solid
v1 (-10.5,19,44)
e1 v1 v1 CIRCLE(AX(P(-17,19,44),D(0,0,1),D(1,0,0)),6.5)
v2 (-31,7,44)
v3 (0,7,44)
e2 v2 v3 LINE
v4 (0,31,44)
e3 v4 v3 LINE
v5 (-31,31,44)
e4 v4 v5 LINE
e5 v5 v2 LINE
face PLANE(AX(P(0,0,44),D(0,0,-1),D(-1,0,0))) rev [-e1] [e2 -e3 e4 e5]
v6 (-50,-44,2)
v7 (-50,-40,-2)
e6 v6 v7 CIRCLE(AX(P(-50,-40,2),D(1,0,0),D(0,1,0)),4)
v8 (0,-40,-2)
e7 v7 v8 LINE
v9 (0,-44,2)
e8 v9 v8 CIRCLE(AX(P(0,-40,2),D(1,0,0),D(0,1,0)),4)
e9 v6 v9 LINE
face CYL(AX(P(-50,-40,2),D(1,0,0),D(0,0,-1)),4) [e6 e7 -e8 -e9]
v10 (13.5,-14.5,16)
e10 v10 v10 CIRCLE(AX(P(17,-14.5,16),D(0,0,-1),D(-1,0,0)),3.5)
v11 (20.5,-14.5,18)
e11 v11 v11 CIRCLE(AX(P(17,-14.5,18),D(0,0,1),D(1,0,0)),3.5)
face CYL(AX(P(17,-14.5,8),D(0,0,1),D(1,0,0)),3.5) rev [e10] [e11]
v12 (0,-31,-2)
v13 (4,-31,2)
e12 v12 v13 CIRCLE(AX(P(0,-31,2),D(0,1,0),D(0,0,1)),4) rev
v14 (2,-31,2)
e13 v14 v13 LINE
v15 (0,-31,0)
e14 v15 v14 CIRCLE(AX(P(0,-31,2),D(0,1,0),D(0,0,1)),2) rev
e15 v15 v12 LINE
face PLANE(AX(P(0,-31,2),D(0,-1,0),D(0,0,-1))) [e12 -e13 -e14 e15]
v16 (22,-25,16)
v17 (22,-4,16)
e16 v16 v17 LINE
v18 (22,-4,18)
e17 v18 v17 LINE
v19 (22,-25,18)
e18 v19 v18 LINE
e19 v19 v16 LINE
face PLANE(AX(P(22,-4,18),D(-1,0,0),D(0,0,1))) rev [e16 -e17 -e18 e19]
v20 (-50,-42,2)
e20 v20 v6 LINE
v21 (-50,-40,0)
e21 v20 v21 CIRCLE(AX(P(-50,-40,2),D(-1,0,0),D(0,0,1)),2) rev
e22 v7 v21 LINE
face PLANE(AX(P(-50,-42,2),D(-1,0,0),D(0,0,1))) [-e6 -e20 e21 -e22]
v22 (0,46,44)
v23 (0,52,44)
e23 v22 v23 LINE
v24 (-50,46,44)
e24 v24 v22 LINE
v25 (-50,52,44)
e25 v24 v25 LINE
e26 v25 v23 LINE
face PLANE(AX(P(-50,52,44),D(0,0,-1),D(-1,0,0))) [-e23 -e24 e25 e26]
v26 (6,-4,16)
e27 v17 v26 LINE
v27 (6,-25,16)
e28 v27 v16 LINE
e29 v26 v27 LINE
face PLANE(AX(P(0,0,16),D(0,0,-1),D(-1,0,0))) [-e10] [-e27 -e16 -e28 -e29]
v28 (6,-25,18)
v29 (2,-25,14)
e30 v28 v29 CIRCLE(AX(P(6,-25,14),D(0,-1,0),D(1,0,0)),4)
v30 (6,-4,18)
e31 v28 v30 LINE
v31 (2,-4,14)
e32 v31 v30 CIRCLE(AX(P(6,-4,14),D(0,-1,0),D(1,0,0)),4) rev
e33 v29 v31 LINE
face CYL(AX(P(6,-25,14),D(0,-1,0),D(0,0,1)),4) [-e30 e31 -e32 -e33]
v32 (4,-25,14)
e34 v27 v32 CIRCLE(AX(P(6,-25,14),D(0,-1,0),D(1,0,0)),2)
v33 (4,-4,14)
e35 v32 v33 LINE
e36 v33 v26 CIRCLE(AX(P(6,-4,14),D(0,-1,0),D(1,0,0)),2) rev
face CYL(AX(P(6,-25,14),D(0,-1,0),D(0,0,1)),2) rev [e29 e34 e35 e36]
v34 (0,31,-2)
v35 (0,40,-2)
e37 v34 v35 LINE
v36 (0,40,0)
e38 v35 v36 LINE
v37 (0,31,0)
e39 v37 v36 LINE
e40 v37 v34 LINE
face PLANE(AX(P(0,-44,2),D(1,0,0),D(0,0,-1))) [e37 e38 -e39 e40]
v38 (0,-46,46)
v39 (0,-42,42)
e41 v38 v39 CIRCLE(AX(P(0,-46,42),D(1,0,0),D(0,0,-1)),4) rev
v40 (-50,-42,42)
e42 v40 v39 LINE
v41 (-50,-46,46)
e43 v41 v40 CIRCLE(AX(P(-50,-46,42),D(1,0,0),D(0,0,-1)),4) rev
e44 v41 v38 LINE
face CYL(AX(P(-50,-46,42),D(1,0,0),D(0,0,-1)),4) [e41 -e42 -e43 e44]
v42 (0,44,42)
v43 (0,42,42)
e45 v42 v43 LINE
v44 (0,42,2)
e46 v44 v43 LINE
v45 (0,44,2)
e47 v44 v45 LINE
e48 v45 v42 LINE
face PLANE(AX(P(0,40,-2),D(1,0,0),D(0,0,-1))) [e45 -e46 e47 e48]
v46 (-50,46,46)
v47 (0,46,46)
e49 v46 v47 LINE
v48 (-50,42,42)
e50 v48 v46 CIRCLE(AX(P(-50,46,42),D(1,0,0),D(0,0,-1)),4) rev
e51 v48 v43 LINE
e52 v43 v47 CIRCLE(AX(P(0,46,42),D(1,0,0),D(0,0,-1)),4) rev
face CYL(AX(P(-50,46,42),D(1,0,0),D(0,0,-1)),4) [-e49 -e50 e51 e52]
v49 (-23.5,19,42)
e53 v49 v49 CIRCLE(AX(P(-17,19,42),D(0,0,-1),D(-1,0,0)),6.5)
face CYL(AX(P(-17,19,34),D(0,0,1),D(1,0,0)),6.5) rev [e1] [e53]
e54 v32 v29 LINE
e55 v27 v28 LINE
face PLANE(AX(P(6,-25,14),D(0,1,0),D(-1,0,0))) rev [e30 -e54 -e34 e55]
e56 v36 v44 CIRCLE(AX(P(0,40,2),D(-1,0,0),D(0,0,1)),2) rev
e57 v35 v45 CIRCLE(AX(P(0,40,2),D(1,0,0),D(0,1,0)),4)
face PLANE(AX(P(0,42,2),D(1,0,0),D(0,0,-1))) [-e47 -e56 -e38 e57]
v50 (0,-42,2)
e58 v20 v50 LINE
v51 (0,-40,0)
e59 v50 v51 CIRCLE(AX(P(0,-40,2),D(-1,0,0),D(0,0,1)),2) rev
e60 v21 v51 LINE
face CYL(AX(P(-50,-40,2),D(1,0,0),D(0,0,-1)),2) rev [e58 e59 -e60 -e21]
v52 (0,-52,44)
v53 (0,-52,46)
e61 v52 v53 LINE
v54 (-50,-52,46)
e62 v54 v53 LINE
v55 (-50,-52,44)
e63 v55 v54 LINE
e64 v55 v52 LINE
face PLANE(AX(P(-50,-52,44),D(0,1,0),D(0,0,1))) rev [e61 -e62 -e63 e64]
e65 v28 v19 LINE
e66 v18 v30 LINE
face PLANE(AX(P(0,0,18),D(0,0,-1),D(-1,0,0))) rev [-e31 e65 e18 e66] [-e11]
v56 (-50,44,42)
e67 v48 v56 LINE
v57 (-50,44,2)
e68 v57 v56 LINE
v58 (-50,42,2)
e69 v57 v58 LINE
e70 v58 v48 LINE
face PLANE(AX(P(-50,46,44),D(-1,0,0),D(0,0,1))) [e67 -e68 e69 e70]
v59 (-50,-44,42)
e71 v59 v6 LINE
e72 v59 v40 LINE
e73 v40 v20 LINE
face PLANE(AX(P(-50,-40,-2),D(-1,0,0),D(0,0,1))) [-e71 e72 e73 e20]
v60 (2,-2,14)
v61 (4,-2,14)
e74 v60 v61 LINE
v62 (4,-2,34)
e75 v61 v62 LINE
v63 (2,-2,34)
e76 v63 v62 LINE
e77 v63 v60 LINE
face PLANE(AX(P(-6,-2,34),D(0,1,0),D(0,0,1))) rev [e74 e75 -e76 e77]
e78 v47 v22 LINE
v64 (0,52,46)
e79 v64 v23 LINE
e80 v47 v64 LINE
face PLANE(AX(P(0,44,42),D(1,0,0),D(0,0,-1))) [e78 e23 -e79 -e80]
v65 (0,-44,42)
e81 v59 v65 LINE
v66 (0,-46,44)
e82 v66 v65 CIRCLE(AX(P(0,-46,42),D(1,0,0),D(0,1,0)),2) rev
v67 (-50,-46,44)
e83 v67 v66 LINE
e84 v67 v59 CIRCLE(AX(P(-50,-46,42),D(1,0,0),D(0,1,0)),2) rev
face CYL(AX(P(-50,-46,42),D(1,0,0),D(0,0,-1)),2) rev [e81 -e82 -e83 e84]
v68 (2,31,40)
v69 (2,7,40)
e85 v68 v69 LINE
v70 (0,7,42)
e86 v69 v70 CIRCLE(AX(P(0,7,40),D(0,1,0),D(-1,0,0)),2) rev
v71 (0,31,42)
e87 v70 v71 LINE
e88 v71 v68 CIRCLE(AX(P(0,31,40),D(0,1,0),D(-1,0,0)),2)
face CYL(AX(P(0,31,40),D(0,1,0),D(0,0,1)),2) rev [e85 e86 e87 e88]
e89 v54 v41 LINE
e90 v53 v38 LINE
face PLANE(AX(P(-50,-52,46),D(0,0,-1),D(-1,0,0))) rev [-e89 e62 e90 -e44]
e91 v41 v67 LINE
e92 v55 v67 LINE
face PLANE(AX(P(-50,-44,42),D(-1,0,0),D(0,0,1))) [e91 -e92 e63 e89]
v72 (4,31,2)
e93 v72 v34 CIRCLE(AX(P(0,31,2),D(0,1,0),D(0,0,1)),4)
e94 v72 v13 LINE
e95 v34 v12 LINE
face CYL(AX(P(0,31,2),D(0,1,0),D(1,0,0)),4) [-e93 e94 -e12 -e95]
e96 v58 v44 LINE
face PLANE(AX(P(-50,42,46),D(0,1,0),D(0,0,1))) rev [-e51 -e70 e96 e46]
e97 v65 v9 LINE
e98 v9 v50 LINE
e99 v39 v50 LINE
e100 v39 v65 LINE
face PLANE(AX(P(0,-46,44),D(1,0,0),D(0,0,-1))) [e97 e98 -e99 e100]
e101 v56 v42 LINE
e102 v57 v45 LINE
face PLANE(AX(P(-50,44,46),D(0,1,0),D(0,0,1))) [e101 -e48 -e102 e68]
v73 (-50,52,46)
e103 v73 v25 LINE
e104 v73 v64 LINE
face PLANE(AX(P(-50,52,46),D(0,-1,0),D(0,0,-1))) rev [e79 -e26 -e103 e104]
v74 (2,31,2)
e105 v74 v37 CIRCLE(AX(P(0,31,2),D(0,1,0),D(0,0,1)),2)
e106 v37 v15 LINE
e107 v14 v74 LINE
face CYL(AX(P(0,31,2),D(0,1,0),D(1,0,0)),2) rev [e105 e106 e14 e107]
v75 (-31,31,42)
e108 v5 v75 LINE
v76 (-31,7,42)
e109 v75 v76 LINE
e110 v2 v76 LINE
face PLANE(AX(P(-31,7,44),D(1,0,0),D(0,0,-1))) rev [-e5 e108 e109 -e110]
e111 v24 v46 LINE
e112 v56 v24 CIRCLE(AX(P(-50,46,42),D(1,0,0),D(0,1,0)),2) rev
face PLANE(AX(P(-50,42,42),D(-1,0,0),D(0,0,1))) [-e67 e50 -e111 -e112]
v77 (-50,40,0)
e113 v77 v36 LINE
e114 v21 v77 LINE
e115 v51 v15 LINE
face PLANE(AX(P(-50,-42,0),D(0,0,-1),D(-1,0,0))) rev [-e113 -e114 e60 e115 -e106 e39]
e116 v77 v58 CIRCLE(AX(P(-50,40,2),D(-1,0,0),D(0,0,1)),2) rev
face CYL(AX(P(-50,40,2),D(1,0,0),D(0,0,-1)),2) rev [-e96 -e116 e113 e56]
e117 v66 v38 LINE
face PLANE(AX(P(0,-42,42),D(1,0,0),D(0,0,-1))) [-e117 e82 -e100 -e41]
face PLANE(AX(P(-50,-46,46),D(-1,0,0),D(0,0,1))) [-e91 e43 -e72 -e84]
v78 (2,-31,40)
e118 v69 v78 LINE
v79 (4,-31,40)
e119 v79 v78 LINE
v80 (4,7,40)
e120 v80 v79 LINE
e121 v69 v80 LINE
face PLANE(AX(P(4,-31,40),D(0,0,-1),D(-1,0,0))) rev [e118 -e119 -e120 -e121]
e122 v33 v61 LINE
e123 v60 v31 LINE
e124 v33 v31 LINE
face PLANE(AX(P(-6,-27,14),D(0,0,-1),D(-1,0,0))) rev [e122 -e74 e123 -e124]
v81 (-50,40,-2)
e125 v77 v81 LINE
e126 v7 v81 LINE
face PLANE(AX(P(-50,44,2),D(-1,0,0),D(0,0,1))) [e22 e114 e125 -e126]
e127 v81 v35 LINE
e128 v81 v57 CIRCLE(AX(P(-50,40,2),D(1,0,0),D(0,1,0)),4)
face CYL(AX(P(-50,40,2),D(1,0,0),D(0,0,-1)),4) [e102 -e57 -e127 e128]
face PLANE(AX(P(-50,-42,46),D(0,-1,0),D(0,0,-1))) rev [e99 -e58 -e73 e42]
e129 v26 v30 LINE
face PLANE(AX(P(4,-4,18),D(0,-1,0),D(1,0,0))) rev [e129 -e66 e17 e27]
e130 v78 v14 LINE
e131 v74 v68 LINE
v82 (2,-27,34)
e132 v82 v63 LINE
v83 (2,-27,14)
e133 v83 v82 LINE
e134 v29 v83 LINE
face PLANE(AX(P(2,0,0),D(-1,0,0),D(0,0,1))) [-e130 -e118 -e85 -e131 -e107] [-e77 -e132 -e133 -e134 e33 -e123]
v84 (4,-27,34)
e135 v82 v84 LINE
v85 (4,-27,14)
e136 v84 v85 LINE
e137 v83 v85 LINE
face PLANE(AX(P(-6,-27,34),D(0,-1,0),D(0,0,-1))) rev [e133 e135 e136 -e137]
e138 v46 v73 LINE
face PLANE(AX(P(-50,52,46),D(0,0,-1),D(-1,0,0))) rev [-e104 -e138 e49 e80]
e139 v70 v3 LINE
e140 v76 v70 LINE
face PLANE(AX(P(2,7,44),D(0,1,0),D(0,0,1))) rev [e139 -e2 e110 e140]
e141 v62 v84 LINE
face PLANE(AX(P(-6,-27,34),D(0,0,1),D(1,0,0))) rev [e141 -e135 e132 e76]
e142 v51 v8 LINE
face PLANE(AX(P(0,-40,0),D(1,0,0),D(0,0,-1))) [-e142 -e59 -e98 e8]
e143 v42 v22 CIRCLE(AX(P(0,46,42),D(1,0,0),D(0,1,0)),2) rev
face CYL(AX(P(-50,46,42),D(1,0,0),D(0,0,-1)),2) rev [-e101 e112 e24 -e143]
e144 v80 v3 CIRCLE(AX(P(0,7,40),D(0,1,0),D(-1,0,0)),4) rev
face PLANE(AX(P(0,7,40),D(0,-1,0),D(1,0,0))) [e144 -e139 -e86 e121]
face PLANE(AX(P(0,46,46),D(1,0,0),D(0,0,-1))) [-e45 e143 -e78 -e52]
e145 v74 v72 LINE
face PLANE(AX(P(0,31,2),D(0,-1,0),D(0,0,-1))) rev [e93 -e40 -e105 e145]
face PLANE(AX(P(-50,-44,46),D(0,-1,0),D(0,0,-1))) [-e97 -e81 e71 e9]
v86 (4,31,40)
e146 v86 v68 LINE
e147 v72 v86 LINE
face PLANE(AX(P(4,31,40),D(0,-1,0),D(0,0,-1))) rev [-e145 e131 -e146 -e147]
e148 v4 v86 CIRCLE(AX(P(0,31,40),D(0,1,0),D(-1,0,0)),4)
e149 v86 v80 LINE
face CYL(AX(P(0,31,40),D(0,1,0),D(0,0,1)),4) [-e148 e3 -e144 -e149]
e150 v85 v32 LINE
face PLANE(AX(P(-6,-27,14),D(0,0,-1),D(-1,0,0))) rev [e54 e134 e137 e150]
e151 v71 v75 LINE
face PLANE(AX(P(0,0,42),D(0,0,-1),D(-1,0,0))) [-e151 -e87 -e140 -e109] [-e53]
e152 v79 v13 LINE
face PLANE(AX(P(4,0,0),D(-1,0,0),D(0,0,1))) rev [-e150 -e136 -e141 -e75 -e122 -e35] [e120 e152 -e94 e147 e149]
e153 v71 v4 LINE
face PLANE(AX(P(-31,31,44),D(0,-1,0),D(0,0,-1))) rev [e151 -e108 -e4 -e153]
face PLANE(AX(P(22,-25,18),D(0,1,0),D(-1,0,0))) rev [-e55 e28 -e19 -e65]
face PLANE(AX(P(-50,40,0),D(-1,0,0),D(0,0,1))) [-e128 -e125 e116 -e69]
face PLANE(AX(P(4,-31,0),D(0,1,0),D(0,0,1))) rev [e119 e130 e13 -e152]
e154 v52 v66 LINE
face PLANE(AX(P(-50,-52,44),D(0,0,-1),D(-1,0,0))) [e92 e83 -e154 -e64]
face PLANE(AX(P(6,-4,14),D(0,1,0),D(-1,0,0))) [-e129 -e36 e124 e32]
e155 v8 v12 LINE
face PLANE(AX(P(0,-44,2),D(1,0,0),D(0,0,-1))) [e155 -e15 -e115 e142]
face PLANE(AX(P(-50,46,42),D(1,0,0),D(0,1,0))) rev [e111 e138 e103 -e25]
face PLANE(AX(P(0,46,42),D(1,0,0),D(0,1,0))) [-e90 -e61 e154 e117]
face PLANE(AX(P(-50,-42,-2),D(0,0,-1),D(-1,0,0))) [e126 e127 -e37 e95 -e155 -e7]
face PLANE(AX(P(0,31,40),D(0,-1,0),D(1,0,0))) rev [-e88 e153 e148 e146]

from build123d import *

# Parameters (mm, degrees)
BASE_FLANGE1_DEPTH = 50
EDGE_FLANGE1_DEPTH = 62
SKETCH9_W          = 25
SKETCH9_H          = 20
CUT_EXTRUDE1_DEPTH = 10
EDGE_FLANGE2_DEPTH = 21
SKETCH13_R         = 3.5
CUT_EXTRUDE2_DEPTH = 10
EDGE_FLANGE3_DEPTH = 24
SKETCH17_R         = 6.5
CUT_EXTRUDE3_DEPTH = 10


# Sheet-metal steps are written as plain solids
with BuildPart() as part:
    # Sketch1 → Base-Flange1 (new body)
    with BuildSketch(Plane.YZ):
        with BuildLine():
            Line((-52, 46), (-46, 46))
            ThreePointArc((-46, 46), (-43.171572875, 44.828427125), (-42, 42))
            Line((-42, 42), (-42, 2))
            ThreePointArc((-42, 2), (-41.414213562, 0.585786438), (-40, 0))
            Line((-40, 0), (40, 0))
            ThreePointArc((40, 0), (41.414213562, 0.585786438), (42, 2))
            Line((42, 2), (42, 42))
            ThreePointArc((42, 42), (43.171572875, 44.828427125), (46, 46))
            Line((46, 46), (52, 46))
            Line((52, 46), (52, 44))
            Line((52, 44), (46, 44))
            ThreePointArc((46, 44), (44.585786438, 43.414213562), (44, 42))
            Line((44, 42), (44, 2))
            ThreePointArc((44, 2), (42.828427125, -0.828427125), (40, -2))
            Line((40, -2), (-40, -2))
            ThreePointArc((-40, -2), (-42.828427125, -0.828427125), (-44, 2))
            Line((-44, 2), (-44, 42))
            ThreePointArc((-44, 42), (-44.585786438, 43.414213562), (-46, 44))
            Line((-46, 44), (-52, 44))
            Line((-52, 44), (-52, 46))
        make_face()
    extrude(amount=-BASE_FLANGE1_DEPTH)

    # Edge-Flange1 section (across the edge) → Edge-Flange1 (add)
    with BuildSketch(Plane(origin=(2, -31, 0), x_dir=(-1, 0, 0), z_dir=(0, 1, 0))):
        with BuildLine():
            Line((-2, 2), (-2, 40))
            Line((-2, 40), (0, 40))
            Line((0, 40), (0, 2))
            ThreePointArc((0, 2), (0.585786438, 0.585786438), (2, 0))
            Line((2, 0), (2, -2))
            ThreePointArc((2, -2), (-0.828427125, -0.828427125), (-2, 2))
        make_face()
    extrude(amount=EDGE_FLANGE1_DEPTH)

    # Sketch9 → Cut-Extrude1 (cut)
    with BuildSketch(Plane.YZ.offset(4)):
        with Locations((-14.5, 24)):
            Rectangle(SKETCH9_W, SKETCH9_H)
    extrude(amount=-CUT_EXTRUDE1_DEPTH, mode=Mode.SUBTRACT)

    # Edge-Flange2 section (across the edge) → Edge-Flange2 (add)
    with BuildSketch(Plane(origin=(4, -4, 16), x_dir=(0, 0, -1), z_dir=(0, -1, 0))):
        with BuildLine():
            Line((-2, 2), (-2, 18))
            Line((-2, 18), (0, 18))
            Line((0, 18), (0, 2))
            ThreePointArc((0, 2), (0.585786438, 0.585786438), (2, 0))
            Line((2, 0), (2, -2))
            ThreePointArc((2, -2), (-0.828427125, -0.828427125), (-2, 2))
        make_face()
    extrude(amount=EDGE_FLANGE2_DEPTH)

    # Sketch13 → Cut-Extrude2 (cut)
    with BuildSketch(Plane.XY.offset(18)):
        with Locations((17, -14.5)):
            Circle(SKETCH13_R)
    extrude(amount=-CUT_EXTRUDE2_DEPTH, mode=Mode.SUBTRACT)

    # Edge-Flange3 section (across the edge) → Edge-Flange3 (add)
    with BuildSketch(Plane(origin=(2, 7, 42), x_dir=(0, 0, -1), z_dir=(0, 1, 0))):
        with BuildLine():
            Line((-2, 2), (-2, 33))
            Line((-2, 33), (0, 33))
            Line((0, 33), (0, 2))
            ThreePointArc((0, 2), (0.585786438, 0.585786438), (2, 0))
            Line((2, 0), (2, -2))
            ThreePointArc((2, -2), (-0.828427125, -0.828427125), (-2, 2))
        make_face()
    extrude(amount=EDGE_FLANGE3_DEPTH)

    # Sketch17 → Cut-Extrude3 (cut)
    with BuildSketch(Plane.XY.offset(44)):
        with Locations((-17, 19)):
            Circle(SKETCH17_R)
    extrude(amount=-CUT_EXTRUDE3_DEPTH, mode=Mode.SUBTRACT)


solid = part.part
